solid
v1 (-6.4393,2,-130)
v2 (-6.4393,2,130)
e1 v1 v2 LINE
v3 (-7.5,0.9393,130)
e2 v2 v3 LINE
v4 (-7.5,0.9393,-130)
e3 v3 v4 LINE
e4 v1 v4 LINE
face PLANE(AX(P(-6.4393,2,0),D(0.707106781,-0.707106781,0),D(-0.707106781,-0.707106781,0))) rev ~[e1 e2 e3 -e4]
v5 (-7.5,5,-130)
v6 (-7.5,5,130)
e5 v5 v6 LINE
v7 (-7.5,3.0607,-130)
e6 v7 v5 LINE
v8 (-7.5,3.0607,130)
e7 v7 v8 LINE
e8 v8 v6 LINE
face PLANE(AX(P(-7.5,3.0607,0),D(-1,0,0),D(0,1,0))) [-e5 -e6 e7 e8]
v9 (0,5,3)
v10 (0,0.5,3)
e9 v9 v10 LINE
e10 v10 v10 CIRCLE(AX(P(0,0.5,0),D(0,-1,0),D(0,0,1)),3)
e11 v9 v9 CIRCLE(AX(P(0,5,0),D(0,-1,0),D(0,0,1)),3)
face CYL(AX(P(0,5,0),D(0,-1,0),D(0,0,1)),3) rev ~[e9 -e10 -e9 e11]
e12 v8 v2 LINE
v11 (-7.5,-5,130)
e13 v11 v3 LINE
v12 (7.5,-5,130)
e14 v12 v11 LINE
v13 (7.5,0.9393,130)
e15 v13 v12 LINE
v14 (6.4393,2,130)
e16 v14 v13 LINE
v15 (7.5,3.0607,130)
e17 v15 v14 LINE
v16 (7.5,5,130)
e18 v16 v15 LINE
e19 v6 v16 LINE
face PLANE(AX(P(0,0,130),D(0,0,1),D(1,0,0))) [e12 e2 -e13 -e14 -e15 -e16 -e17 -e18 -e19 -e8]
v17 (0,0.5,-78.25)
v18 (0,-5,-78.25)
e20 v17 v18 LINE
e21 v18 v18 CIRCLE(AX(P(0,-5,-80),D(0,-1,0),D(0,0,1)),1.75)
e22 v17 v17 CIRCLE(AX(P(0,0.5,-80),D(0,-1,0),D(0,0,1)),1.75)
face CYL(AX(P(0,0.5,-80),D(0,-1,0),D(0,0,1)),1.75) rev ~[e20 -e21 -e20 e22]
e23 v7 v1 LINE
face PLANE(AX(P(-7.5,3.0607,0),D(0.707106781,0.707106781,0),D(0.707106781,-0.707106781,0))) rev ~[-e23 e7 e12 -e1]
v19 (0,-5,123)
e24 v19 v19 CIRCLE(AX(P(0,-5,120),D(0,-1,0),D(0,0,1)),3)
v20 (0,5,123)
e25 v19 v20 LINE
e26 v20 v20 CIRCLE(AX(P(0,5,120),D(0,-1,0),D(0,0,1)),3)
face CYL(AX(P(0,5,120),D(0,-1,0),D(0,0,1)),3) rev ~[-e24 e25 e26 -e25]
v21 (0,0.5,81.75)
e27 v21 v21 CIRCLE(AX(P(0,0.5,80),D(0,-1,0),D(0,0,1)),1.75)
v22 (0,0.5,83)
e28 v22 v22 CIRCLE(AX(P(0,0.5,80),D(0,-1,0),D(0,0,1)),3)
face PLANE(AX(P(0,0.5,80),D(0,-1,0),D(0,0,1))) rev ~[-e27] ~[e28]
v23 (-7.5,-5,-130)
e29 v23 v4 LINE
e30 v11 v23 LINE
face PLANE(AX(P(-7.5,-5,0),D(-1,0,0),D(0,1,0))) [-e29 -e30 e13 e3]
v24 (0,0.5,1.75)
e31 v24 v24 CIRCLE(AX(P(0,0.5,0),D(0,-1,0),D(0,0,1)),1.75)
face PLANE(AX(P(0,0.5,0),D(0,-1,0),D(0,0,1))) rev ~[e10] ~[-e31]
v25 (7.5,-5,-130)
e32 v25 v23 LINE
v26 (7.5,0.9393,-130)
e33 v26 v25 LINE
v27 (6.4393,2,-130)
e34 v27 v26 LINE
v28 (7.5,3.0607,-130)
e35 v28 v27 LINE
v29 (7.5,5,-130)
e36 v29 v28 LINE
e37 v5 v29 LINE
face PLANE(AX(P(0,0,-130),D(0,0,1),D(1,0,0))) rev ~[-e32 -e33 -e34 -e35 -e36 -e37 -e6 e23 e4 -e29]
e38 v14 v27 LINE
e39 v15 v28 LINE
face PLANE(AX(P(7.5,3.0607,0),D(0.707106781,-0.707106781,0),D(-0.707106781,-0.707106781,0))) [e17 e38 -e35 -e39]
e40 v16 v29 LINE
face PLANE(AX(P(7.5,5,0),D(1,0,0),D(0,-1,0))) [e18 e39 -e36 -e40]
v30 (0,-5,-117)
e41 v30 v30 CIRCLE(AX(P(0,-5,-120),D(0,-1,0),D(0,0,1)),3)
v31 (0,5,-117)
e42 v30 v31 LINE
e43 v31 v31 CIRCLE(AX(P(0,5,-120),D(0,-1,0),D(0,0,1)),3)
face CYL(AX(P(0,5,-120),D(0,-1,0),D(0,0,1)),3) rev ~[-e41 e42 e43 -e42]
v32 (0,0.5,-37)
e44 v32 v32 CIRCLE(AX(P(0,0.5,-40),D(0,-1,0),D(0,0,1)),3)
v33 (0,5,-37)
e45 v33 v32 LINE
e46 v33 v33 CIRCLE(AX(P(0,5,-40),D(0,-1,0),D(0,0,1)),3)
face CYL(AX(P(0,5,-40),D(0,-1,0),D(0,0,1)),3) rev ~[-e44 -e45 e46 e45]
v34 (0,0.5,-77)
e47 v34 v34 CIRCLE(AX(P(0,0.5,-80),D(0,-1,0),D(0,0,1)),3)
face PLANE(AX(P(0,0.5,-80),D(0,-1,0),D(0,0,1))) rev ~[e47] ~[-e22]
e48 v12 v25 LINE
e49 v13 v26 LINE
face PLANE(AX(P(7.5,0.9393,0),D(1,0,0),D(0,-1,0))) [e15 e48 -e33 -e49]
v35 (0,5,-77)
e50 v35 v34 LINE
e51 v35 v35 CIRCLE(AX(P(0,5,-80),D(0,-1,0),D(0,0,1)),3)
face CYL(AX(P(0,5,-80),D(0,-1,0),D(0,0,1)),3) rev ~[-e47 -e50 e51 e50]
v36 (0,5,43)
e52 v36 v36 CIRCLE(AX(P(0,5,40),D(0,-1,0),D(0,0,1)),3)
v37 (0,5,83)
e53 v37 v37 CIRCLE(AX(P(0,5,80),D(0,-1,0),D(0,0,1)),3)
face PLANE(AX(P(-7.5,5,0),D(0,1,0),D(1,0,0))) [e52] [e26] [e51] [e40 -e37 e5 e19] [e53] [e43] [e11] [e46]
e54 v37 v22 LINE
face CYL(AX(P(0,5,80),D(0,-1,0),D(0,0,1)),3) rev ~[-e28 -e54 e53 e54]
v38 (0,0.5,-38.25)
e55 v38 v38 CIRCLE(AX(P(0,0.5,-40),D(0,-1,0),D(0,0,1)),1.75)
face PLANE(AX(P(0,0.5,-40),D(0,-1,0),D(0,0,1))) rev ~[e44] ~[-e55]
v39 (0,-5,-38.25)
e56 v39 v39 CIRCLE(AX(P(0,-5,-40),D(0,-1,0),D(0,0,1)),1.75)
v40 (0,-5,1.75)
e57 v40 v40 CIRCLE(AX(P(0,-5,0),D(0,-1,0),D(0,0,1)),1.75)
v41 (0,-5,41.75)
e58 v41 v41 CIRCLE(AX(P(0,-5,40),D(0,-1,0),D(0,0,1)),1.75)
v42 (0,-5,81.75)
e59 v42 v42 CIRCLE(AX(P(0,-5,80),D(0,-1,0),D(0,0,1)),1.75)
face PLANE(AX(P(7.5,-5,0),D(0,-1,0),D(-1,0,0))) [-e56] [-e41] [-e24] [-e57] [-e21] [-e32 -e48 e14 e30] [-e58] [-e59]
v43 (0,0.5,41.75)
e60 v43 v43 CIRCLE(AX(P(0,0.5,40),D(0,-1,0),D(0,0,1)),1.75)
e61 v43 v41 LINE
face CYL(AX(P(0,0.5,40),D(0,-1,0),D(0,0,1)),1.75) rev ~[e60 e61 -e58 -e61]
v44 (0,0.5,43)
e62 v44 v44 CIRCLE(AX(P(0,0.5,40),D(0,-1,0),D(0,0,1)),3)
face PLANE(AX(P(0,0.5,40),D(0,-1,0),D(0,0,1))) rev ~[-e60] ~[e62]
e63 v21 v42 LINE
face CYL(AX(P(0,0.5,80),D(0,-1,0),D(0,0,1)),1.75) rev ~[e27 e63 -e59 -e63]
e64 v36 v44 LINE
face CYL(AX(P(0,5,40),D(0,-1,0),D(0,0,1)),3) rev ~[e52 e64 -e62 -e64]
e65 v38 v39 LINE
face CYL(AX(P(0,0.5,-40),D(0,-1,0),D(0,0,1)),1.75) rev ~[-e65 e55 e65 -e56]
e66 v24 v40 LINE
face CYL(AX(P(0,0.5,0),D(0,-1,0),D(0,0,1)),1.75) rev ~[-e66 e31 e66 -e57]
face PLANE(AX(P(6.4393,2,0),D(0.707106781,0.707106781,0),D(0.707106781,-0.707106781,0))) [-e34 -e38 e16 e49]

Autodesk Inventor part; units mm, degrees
ref_plane "YZ Plane" through (0, 0, 0) normal (1, 0, 0) x (0, 1, 0)
ref_plane "XZ Plane" through (0, 0, 0) normal (0, 1, 0) x (-1, 0, 0)
ref_plane "XY Plane" through (0, 0, 0) normal (0, 0, 1) x (1, 0, 0)
sketch "Sketch1" plane through (0, 0, 0) normal (0, 0, 1) x (1, 0, 0)
  line L0 (-7.5, 5) -> (7.5, 5)
  line L1 (7.5, 5) -> (7.5, -5)
  line L2 (7.5, -5) -> (-7.5, -5)
  line L3 (-7.5, -5) -> (-7.5, 5)
  line L4 (-7.5, 5) -> (7.5, -5) construction
  line L5 (7.5, 5) -> (-7.5, -5) construction
  line L6 (-7.5, 3.0607) -> (-6.4393, 2)
  line L7 (-7.5, 3.0607) -> (-6, 3.0607) construction
  line L8 (-6.4393, 2) -> (-7.5, 0.9393)
  line L9 (0, 5) -> (0, -5) construction
  line L10 (7.5, 3.0607) -> (6.4393, 2)
  line L11 (6.4393, 2) -> (7.5, 0.9393)
  point P0 (0, 0)
  point P1 (7.5, 0.9393)
  point P2 (7.5, 3.0607)
  dimension "d0" = 15
  dimension "d1" = 10
  dimension "d2" = 45
  dimension "d3" = 3
  dimension "d4" = 1.5
extrude "Extrusion1" add sketch "Sketch1" along normal mid plane 260 contours L0 L1 L10 L11 L2 L3 L8 L6
sketch "Sketch2" plane through (-7.5, 5, 130) normal (0, 1, 0) x (1, 0, 0)
  point P0 (7.5, 130)
  point P1 (7.5, 130)
hole "Hole1" at (0, 5, 0) direction (0, -1, 0) diameter 3.5 end through all counterbore diameter 6 counterbore depth 4.5
pattern_linear "Rectangular Pattern1" count 7 spacing 40 along (0, 0, 1) of "Hole1" first direction both ways yes
sketch "Sketch4" plane through (-7.5, 5, 130) normal (0, 1, 0) x (1, 0, 0)
  circle A0 centre (7.5, 250) radius 3 projected
  circle A1 centre (7.5, 10) radius 3 projected
  point P0 (7.5, 130)
hole "Hole3" at (0, 5, 120) at (0, 5, -120) direction (0, -1, 0) diameter 6 end through all
properties part number "MGN15 Rail Middle" material "Stainless Steel, 440C"
